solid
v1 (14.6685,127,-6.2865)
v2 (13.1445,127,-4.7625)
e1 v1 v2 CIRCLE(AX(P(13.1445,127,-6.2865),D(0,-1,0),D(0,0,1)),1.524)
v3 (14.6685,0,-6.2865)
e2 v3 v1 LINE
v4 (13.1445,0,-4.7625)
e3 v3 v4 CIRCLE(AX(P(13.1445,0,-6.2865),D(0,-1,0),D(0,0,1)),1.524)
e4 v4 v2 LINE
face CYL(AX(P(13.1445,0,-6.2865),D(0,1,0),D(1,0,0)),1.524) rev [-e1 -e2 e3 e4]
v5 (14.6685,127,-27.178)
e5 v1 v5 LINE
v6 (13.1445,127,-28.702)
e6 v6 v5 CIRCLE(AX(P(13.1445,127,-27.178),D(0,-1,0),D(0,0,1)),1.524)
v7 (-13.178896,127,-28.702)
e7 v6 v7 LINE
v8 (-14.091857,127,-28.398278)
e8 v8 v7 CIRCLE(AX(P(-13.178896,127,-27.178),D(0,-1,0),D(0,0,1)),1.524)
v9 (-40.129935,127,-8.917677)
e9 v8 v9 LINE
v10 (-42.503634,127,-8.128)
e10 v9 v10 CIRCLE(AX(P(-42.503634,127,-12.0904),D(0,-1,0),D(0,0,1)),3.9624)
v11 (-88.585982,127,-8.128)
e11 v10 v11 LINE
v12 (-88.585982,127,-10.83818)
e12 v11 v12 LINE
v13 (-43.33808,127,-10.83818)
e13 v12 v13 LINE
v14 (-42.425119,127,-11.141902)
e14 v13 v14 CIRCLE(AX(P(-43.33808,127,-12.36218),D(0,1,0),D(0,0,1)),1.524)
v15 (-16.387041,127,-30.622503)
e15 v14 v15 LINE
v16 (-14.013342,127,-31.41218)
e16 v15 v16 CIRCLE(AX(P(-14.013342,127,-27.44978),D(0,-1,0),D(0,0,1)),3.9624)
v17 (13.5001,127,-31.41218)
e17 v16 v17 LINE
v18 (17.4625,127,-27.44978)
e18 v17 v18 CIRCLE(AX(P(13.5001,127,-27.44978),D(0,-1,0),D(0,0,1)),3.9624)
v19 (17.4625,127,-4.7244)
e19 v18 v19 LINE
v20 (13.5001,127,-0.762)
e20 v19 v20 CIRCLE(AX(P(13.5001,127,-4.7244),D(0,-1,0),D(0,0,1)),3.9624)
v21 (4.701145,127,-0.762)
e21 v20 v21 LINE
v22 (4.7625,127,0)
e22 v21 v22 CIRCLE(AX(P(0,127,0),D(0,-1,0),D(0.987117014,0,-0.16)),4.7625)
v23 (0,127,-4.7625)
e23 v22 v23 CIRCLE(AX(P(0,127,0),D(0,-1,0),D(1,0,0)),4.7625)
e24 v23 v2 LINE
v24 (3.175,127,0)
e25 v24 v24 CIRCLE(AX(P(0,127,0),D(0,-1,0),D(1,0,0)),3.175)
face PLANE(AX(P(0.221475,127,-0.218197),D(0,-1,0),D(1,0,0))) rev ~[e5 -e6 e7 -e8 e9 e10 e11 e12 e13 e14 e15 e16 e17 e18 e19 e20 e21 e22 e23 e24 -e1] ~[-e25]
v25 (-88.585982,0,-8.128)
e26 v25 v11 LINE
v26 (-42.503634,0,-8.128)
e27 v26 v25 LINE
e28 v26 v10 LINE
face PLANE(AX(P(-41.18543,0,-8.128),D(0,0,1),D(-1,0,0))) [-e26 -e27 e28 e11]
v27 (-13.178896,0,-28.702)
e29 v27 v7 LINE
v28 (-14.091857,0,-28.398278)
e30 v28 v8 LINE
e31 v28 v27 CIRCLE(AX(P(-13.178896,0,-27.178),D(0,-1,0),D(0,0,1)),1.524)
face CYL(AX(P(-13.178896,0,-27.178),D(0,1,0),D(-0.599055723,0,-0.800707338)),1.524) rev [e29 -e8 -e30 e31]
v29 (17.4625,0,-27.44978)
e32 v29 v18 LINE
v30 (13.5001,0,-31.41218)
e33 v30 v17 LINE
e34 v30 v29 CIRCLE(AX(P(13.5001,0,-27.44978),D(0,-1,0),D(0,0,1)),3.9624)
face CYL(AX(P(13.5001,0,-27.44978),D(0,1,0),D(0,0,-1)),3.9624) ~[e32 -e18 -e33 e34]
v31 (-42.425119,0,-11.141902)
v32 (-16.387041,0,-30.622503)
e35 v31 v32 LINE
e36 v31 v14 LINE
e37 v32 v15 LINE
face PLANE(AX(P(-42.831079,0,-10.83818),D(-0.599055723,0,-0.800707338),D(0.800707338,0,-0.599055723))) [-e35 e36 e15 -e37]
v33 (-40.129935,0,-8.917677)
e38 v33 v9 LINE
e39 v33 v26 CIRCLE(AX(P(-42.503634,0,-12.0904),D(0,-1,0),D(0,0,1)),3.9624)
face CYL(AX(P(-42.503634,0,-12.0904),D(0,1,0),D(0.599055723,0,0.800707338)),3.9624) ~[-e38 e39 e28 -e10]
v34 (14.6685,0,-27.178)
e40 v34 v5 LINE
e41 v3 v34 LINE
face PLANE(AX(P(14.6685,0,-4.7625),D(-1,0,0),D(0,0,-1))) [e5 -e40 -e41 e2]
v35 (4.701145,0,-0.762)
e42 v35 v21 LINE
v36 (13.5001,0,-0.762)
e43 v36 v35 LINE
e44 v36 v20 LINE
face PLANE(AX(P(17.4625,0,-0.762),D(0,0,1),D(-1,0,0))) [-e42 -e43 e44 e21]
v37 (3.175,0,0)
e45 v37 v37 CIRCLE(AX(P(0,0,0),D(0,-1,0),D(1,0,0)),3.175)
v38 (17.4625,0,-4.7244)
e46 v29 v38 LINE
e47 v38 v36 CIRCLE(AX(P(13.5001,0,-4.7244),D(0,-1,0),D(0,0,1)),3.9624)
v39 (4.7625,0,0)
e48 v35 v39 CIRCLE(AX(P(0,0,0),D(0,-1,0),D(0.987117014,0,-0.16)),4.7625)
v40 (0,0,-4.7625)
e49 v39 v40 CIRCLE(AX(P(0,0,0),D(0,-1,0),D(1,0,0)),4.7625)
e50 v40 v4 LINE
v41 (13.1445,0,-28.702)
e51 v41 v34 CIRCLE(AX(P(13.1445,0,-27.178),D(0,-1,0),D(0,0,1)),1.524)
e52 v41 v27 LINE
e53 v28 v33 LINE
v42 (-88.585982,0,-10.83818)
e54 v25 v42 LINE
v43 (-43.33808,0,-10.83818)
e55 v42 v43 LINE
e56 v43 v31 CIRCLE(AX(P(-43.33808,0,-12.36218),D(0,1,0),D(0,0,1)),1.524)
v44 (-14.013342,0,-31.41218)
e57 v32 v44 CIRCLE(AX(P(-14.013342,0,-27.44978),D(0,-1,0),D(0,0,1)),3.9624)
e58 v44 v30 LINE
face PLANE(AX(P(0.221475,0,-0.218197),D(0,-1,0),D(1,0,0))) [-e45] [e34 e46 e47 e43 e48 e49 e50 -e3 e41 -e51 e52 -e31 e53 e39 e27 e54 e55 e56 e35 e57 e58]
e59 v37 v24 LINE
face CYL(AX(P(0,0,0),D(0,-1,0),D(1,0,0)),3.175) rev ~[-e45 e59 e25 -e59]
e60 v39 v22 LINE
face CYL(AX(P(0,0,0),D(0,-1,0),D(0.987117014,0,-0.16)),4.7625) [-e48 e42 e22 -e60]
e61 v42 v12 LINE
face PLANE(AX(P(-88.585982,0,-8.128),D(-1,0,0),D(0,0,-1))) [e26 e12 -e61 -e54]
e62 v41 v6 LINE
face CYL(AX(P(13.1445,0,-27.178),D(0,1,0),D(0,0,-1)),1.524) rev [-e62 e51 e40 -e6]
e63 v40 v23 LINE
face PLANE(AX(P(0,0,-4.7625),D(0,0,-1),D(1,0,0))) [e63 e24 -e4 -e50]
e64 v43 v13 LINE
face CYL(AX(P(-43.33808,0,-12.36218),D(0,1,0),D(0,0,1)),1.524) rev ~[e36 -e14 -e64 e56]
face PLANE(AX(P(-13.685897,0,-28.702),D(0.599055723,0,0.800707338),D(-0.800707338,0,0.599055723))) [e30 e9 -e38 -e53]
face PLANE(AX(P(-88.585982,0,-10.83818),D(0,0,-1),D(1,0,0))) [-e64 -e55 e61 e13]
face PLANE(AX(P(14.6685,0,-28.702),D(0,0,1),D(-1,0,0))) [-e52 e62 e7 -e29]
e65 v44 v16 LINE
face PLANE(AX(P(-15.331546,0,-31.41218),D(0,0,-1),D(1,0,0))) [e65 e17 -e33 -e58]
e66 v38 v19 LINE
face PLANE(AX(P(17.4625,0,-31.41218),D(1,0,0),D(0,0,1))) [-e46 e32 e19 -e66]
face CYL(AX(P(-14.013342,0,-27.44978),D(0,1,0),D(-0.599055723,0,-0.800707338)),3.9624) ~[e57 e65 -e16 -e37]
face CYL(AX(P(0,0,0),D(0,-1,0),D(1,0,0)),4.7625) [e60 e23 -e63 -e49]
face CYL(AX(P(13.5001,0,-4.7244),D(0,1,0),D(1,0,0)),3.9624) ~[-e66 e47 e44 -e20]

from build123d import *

# Parameters (mm, degrees)
F0_R     = 3.175
F1_DEPTH = 127
F2_R     = 3.9624
F3_R     = 1.524


# Not quite as in the source:
# - a feature names something its author has since deleted; it is built from what else it names


with BuildPart() as f1:
    # F0 (on Front) → F1 (new body)
    with BuildSketch(Plane.XZ):
        with BuildLine():
            ThreePointArc((4.7011447808, -0.762), (4.7471364141, -0.3822330647), (4.7625, 0))
            ThreePointArc((4.7625, 0), (-3.3675960454, 3.3675960454), (0, -4.7625))
            ThreePointArc((0, -4.7625), (3.0864527576, -3.6270119417), (4.7011447808, -0.762))
        make_face()
        Circle(F0_R, mode=Mode.SUBTRACT)
        with BuildLine():
            ThreePointArc((4.7011447808, -0.762), (3.0864527576, -3.6270119417), (0, -4.7625))
            Line((0, -4.7625), (14.6685, -4.7625))
            Line((14.6685, -4.7625), (14.6685, -28.702))
            Line((14.6685, -28.702), (-13.6858972215, -28.702))
            Line((-13.6858972215, -28.702), (-41.1854304771, -8.128))
            Line((-41.1854304771, -8.128), (-88.58598171, -8.128))
            Line((-88.58598171, -8.128), (-88.58598171, -10.83818))
            Line((-88.58598171, -10.83818), (-42.8310789114, -10.83818))
            Line((-42.8310789114, -10.83818), (-15.3315456557, -31.41218))
            Line((-15.3315456557, -31.41218), (17.4625, -31.41218))
            Line((17.4625, -31.41218), (17.4625, -0.762))
            Line((17.4625, -0.762), (4.7011447808, -0.762))
        make_face()
    extrude(amount=-F1_DEPTH)

    # F2
    f2_edges = [f1.edges().sort_by_distance(p)[0] for p in [
        (17.4625, 63.5, -0.762),
        (-15.331546, 63.5, -31.41218),
        (-41.18543, 63.5, -8.128),
        (17.4625, 63.5, -31.41218),
    ]]
    fillet(f2_edges, radius=F2_R)

    # F3
    f3_edges = [f1.edges().sort_by_distance(p)[0] for p in [
        (14.6685, 63.5, -4.7625),
        (-13.685897, 63.5, -28.702),
        (-42.831079, 63.5, -10.83818),
        (14.6685, 63.5, -28.702),
    ]]
    fillet(f3_edges, radius=F3_R)


solid = f1.part
